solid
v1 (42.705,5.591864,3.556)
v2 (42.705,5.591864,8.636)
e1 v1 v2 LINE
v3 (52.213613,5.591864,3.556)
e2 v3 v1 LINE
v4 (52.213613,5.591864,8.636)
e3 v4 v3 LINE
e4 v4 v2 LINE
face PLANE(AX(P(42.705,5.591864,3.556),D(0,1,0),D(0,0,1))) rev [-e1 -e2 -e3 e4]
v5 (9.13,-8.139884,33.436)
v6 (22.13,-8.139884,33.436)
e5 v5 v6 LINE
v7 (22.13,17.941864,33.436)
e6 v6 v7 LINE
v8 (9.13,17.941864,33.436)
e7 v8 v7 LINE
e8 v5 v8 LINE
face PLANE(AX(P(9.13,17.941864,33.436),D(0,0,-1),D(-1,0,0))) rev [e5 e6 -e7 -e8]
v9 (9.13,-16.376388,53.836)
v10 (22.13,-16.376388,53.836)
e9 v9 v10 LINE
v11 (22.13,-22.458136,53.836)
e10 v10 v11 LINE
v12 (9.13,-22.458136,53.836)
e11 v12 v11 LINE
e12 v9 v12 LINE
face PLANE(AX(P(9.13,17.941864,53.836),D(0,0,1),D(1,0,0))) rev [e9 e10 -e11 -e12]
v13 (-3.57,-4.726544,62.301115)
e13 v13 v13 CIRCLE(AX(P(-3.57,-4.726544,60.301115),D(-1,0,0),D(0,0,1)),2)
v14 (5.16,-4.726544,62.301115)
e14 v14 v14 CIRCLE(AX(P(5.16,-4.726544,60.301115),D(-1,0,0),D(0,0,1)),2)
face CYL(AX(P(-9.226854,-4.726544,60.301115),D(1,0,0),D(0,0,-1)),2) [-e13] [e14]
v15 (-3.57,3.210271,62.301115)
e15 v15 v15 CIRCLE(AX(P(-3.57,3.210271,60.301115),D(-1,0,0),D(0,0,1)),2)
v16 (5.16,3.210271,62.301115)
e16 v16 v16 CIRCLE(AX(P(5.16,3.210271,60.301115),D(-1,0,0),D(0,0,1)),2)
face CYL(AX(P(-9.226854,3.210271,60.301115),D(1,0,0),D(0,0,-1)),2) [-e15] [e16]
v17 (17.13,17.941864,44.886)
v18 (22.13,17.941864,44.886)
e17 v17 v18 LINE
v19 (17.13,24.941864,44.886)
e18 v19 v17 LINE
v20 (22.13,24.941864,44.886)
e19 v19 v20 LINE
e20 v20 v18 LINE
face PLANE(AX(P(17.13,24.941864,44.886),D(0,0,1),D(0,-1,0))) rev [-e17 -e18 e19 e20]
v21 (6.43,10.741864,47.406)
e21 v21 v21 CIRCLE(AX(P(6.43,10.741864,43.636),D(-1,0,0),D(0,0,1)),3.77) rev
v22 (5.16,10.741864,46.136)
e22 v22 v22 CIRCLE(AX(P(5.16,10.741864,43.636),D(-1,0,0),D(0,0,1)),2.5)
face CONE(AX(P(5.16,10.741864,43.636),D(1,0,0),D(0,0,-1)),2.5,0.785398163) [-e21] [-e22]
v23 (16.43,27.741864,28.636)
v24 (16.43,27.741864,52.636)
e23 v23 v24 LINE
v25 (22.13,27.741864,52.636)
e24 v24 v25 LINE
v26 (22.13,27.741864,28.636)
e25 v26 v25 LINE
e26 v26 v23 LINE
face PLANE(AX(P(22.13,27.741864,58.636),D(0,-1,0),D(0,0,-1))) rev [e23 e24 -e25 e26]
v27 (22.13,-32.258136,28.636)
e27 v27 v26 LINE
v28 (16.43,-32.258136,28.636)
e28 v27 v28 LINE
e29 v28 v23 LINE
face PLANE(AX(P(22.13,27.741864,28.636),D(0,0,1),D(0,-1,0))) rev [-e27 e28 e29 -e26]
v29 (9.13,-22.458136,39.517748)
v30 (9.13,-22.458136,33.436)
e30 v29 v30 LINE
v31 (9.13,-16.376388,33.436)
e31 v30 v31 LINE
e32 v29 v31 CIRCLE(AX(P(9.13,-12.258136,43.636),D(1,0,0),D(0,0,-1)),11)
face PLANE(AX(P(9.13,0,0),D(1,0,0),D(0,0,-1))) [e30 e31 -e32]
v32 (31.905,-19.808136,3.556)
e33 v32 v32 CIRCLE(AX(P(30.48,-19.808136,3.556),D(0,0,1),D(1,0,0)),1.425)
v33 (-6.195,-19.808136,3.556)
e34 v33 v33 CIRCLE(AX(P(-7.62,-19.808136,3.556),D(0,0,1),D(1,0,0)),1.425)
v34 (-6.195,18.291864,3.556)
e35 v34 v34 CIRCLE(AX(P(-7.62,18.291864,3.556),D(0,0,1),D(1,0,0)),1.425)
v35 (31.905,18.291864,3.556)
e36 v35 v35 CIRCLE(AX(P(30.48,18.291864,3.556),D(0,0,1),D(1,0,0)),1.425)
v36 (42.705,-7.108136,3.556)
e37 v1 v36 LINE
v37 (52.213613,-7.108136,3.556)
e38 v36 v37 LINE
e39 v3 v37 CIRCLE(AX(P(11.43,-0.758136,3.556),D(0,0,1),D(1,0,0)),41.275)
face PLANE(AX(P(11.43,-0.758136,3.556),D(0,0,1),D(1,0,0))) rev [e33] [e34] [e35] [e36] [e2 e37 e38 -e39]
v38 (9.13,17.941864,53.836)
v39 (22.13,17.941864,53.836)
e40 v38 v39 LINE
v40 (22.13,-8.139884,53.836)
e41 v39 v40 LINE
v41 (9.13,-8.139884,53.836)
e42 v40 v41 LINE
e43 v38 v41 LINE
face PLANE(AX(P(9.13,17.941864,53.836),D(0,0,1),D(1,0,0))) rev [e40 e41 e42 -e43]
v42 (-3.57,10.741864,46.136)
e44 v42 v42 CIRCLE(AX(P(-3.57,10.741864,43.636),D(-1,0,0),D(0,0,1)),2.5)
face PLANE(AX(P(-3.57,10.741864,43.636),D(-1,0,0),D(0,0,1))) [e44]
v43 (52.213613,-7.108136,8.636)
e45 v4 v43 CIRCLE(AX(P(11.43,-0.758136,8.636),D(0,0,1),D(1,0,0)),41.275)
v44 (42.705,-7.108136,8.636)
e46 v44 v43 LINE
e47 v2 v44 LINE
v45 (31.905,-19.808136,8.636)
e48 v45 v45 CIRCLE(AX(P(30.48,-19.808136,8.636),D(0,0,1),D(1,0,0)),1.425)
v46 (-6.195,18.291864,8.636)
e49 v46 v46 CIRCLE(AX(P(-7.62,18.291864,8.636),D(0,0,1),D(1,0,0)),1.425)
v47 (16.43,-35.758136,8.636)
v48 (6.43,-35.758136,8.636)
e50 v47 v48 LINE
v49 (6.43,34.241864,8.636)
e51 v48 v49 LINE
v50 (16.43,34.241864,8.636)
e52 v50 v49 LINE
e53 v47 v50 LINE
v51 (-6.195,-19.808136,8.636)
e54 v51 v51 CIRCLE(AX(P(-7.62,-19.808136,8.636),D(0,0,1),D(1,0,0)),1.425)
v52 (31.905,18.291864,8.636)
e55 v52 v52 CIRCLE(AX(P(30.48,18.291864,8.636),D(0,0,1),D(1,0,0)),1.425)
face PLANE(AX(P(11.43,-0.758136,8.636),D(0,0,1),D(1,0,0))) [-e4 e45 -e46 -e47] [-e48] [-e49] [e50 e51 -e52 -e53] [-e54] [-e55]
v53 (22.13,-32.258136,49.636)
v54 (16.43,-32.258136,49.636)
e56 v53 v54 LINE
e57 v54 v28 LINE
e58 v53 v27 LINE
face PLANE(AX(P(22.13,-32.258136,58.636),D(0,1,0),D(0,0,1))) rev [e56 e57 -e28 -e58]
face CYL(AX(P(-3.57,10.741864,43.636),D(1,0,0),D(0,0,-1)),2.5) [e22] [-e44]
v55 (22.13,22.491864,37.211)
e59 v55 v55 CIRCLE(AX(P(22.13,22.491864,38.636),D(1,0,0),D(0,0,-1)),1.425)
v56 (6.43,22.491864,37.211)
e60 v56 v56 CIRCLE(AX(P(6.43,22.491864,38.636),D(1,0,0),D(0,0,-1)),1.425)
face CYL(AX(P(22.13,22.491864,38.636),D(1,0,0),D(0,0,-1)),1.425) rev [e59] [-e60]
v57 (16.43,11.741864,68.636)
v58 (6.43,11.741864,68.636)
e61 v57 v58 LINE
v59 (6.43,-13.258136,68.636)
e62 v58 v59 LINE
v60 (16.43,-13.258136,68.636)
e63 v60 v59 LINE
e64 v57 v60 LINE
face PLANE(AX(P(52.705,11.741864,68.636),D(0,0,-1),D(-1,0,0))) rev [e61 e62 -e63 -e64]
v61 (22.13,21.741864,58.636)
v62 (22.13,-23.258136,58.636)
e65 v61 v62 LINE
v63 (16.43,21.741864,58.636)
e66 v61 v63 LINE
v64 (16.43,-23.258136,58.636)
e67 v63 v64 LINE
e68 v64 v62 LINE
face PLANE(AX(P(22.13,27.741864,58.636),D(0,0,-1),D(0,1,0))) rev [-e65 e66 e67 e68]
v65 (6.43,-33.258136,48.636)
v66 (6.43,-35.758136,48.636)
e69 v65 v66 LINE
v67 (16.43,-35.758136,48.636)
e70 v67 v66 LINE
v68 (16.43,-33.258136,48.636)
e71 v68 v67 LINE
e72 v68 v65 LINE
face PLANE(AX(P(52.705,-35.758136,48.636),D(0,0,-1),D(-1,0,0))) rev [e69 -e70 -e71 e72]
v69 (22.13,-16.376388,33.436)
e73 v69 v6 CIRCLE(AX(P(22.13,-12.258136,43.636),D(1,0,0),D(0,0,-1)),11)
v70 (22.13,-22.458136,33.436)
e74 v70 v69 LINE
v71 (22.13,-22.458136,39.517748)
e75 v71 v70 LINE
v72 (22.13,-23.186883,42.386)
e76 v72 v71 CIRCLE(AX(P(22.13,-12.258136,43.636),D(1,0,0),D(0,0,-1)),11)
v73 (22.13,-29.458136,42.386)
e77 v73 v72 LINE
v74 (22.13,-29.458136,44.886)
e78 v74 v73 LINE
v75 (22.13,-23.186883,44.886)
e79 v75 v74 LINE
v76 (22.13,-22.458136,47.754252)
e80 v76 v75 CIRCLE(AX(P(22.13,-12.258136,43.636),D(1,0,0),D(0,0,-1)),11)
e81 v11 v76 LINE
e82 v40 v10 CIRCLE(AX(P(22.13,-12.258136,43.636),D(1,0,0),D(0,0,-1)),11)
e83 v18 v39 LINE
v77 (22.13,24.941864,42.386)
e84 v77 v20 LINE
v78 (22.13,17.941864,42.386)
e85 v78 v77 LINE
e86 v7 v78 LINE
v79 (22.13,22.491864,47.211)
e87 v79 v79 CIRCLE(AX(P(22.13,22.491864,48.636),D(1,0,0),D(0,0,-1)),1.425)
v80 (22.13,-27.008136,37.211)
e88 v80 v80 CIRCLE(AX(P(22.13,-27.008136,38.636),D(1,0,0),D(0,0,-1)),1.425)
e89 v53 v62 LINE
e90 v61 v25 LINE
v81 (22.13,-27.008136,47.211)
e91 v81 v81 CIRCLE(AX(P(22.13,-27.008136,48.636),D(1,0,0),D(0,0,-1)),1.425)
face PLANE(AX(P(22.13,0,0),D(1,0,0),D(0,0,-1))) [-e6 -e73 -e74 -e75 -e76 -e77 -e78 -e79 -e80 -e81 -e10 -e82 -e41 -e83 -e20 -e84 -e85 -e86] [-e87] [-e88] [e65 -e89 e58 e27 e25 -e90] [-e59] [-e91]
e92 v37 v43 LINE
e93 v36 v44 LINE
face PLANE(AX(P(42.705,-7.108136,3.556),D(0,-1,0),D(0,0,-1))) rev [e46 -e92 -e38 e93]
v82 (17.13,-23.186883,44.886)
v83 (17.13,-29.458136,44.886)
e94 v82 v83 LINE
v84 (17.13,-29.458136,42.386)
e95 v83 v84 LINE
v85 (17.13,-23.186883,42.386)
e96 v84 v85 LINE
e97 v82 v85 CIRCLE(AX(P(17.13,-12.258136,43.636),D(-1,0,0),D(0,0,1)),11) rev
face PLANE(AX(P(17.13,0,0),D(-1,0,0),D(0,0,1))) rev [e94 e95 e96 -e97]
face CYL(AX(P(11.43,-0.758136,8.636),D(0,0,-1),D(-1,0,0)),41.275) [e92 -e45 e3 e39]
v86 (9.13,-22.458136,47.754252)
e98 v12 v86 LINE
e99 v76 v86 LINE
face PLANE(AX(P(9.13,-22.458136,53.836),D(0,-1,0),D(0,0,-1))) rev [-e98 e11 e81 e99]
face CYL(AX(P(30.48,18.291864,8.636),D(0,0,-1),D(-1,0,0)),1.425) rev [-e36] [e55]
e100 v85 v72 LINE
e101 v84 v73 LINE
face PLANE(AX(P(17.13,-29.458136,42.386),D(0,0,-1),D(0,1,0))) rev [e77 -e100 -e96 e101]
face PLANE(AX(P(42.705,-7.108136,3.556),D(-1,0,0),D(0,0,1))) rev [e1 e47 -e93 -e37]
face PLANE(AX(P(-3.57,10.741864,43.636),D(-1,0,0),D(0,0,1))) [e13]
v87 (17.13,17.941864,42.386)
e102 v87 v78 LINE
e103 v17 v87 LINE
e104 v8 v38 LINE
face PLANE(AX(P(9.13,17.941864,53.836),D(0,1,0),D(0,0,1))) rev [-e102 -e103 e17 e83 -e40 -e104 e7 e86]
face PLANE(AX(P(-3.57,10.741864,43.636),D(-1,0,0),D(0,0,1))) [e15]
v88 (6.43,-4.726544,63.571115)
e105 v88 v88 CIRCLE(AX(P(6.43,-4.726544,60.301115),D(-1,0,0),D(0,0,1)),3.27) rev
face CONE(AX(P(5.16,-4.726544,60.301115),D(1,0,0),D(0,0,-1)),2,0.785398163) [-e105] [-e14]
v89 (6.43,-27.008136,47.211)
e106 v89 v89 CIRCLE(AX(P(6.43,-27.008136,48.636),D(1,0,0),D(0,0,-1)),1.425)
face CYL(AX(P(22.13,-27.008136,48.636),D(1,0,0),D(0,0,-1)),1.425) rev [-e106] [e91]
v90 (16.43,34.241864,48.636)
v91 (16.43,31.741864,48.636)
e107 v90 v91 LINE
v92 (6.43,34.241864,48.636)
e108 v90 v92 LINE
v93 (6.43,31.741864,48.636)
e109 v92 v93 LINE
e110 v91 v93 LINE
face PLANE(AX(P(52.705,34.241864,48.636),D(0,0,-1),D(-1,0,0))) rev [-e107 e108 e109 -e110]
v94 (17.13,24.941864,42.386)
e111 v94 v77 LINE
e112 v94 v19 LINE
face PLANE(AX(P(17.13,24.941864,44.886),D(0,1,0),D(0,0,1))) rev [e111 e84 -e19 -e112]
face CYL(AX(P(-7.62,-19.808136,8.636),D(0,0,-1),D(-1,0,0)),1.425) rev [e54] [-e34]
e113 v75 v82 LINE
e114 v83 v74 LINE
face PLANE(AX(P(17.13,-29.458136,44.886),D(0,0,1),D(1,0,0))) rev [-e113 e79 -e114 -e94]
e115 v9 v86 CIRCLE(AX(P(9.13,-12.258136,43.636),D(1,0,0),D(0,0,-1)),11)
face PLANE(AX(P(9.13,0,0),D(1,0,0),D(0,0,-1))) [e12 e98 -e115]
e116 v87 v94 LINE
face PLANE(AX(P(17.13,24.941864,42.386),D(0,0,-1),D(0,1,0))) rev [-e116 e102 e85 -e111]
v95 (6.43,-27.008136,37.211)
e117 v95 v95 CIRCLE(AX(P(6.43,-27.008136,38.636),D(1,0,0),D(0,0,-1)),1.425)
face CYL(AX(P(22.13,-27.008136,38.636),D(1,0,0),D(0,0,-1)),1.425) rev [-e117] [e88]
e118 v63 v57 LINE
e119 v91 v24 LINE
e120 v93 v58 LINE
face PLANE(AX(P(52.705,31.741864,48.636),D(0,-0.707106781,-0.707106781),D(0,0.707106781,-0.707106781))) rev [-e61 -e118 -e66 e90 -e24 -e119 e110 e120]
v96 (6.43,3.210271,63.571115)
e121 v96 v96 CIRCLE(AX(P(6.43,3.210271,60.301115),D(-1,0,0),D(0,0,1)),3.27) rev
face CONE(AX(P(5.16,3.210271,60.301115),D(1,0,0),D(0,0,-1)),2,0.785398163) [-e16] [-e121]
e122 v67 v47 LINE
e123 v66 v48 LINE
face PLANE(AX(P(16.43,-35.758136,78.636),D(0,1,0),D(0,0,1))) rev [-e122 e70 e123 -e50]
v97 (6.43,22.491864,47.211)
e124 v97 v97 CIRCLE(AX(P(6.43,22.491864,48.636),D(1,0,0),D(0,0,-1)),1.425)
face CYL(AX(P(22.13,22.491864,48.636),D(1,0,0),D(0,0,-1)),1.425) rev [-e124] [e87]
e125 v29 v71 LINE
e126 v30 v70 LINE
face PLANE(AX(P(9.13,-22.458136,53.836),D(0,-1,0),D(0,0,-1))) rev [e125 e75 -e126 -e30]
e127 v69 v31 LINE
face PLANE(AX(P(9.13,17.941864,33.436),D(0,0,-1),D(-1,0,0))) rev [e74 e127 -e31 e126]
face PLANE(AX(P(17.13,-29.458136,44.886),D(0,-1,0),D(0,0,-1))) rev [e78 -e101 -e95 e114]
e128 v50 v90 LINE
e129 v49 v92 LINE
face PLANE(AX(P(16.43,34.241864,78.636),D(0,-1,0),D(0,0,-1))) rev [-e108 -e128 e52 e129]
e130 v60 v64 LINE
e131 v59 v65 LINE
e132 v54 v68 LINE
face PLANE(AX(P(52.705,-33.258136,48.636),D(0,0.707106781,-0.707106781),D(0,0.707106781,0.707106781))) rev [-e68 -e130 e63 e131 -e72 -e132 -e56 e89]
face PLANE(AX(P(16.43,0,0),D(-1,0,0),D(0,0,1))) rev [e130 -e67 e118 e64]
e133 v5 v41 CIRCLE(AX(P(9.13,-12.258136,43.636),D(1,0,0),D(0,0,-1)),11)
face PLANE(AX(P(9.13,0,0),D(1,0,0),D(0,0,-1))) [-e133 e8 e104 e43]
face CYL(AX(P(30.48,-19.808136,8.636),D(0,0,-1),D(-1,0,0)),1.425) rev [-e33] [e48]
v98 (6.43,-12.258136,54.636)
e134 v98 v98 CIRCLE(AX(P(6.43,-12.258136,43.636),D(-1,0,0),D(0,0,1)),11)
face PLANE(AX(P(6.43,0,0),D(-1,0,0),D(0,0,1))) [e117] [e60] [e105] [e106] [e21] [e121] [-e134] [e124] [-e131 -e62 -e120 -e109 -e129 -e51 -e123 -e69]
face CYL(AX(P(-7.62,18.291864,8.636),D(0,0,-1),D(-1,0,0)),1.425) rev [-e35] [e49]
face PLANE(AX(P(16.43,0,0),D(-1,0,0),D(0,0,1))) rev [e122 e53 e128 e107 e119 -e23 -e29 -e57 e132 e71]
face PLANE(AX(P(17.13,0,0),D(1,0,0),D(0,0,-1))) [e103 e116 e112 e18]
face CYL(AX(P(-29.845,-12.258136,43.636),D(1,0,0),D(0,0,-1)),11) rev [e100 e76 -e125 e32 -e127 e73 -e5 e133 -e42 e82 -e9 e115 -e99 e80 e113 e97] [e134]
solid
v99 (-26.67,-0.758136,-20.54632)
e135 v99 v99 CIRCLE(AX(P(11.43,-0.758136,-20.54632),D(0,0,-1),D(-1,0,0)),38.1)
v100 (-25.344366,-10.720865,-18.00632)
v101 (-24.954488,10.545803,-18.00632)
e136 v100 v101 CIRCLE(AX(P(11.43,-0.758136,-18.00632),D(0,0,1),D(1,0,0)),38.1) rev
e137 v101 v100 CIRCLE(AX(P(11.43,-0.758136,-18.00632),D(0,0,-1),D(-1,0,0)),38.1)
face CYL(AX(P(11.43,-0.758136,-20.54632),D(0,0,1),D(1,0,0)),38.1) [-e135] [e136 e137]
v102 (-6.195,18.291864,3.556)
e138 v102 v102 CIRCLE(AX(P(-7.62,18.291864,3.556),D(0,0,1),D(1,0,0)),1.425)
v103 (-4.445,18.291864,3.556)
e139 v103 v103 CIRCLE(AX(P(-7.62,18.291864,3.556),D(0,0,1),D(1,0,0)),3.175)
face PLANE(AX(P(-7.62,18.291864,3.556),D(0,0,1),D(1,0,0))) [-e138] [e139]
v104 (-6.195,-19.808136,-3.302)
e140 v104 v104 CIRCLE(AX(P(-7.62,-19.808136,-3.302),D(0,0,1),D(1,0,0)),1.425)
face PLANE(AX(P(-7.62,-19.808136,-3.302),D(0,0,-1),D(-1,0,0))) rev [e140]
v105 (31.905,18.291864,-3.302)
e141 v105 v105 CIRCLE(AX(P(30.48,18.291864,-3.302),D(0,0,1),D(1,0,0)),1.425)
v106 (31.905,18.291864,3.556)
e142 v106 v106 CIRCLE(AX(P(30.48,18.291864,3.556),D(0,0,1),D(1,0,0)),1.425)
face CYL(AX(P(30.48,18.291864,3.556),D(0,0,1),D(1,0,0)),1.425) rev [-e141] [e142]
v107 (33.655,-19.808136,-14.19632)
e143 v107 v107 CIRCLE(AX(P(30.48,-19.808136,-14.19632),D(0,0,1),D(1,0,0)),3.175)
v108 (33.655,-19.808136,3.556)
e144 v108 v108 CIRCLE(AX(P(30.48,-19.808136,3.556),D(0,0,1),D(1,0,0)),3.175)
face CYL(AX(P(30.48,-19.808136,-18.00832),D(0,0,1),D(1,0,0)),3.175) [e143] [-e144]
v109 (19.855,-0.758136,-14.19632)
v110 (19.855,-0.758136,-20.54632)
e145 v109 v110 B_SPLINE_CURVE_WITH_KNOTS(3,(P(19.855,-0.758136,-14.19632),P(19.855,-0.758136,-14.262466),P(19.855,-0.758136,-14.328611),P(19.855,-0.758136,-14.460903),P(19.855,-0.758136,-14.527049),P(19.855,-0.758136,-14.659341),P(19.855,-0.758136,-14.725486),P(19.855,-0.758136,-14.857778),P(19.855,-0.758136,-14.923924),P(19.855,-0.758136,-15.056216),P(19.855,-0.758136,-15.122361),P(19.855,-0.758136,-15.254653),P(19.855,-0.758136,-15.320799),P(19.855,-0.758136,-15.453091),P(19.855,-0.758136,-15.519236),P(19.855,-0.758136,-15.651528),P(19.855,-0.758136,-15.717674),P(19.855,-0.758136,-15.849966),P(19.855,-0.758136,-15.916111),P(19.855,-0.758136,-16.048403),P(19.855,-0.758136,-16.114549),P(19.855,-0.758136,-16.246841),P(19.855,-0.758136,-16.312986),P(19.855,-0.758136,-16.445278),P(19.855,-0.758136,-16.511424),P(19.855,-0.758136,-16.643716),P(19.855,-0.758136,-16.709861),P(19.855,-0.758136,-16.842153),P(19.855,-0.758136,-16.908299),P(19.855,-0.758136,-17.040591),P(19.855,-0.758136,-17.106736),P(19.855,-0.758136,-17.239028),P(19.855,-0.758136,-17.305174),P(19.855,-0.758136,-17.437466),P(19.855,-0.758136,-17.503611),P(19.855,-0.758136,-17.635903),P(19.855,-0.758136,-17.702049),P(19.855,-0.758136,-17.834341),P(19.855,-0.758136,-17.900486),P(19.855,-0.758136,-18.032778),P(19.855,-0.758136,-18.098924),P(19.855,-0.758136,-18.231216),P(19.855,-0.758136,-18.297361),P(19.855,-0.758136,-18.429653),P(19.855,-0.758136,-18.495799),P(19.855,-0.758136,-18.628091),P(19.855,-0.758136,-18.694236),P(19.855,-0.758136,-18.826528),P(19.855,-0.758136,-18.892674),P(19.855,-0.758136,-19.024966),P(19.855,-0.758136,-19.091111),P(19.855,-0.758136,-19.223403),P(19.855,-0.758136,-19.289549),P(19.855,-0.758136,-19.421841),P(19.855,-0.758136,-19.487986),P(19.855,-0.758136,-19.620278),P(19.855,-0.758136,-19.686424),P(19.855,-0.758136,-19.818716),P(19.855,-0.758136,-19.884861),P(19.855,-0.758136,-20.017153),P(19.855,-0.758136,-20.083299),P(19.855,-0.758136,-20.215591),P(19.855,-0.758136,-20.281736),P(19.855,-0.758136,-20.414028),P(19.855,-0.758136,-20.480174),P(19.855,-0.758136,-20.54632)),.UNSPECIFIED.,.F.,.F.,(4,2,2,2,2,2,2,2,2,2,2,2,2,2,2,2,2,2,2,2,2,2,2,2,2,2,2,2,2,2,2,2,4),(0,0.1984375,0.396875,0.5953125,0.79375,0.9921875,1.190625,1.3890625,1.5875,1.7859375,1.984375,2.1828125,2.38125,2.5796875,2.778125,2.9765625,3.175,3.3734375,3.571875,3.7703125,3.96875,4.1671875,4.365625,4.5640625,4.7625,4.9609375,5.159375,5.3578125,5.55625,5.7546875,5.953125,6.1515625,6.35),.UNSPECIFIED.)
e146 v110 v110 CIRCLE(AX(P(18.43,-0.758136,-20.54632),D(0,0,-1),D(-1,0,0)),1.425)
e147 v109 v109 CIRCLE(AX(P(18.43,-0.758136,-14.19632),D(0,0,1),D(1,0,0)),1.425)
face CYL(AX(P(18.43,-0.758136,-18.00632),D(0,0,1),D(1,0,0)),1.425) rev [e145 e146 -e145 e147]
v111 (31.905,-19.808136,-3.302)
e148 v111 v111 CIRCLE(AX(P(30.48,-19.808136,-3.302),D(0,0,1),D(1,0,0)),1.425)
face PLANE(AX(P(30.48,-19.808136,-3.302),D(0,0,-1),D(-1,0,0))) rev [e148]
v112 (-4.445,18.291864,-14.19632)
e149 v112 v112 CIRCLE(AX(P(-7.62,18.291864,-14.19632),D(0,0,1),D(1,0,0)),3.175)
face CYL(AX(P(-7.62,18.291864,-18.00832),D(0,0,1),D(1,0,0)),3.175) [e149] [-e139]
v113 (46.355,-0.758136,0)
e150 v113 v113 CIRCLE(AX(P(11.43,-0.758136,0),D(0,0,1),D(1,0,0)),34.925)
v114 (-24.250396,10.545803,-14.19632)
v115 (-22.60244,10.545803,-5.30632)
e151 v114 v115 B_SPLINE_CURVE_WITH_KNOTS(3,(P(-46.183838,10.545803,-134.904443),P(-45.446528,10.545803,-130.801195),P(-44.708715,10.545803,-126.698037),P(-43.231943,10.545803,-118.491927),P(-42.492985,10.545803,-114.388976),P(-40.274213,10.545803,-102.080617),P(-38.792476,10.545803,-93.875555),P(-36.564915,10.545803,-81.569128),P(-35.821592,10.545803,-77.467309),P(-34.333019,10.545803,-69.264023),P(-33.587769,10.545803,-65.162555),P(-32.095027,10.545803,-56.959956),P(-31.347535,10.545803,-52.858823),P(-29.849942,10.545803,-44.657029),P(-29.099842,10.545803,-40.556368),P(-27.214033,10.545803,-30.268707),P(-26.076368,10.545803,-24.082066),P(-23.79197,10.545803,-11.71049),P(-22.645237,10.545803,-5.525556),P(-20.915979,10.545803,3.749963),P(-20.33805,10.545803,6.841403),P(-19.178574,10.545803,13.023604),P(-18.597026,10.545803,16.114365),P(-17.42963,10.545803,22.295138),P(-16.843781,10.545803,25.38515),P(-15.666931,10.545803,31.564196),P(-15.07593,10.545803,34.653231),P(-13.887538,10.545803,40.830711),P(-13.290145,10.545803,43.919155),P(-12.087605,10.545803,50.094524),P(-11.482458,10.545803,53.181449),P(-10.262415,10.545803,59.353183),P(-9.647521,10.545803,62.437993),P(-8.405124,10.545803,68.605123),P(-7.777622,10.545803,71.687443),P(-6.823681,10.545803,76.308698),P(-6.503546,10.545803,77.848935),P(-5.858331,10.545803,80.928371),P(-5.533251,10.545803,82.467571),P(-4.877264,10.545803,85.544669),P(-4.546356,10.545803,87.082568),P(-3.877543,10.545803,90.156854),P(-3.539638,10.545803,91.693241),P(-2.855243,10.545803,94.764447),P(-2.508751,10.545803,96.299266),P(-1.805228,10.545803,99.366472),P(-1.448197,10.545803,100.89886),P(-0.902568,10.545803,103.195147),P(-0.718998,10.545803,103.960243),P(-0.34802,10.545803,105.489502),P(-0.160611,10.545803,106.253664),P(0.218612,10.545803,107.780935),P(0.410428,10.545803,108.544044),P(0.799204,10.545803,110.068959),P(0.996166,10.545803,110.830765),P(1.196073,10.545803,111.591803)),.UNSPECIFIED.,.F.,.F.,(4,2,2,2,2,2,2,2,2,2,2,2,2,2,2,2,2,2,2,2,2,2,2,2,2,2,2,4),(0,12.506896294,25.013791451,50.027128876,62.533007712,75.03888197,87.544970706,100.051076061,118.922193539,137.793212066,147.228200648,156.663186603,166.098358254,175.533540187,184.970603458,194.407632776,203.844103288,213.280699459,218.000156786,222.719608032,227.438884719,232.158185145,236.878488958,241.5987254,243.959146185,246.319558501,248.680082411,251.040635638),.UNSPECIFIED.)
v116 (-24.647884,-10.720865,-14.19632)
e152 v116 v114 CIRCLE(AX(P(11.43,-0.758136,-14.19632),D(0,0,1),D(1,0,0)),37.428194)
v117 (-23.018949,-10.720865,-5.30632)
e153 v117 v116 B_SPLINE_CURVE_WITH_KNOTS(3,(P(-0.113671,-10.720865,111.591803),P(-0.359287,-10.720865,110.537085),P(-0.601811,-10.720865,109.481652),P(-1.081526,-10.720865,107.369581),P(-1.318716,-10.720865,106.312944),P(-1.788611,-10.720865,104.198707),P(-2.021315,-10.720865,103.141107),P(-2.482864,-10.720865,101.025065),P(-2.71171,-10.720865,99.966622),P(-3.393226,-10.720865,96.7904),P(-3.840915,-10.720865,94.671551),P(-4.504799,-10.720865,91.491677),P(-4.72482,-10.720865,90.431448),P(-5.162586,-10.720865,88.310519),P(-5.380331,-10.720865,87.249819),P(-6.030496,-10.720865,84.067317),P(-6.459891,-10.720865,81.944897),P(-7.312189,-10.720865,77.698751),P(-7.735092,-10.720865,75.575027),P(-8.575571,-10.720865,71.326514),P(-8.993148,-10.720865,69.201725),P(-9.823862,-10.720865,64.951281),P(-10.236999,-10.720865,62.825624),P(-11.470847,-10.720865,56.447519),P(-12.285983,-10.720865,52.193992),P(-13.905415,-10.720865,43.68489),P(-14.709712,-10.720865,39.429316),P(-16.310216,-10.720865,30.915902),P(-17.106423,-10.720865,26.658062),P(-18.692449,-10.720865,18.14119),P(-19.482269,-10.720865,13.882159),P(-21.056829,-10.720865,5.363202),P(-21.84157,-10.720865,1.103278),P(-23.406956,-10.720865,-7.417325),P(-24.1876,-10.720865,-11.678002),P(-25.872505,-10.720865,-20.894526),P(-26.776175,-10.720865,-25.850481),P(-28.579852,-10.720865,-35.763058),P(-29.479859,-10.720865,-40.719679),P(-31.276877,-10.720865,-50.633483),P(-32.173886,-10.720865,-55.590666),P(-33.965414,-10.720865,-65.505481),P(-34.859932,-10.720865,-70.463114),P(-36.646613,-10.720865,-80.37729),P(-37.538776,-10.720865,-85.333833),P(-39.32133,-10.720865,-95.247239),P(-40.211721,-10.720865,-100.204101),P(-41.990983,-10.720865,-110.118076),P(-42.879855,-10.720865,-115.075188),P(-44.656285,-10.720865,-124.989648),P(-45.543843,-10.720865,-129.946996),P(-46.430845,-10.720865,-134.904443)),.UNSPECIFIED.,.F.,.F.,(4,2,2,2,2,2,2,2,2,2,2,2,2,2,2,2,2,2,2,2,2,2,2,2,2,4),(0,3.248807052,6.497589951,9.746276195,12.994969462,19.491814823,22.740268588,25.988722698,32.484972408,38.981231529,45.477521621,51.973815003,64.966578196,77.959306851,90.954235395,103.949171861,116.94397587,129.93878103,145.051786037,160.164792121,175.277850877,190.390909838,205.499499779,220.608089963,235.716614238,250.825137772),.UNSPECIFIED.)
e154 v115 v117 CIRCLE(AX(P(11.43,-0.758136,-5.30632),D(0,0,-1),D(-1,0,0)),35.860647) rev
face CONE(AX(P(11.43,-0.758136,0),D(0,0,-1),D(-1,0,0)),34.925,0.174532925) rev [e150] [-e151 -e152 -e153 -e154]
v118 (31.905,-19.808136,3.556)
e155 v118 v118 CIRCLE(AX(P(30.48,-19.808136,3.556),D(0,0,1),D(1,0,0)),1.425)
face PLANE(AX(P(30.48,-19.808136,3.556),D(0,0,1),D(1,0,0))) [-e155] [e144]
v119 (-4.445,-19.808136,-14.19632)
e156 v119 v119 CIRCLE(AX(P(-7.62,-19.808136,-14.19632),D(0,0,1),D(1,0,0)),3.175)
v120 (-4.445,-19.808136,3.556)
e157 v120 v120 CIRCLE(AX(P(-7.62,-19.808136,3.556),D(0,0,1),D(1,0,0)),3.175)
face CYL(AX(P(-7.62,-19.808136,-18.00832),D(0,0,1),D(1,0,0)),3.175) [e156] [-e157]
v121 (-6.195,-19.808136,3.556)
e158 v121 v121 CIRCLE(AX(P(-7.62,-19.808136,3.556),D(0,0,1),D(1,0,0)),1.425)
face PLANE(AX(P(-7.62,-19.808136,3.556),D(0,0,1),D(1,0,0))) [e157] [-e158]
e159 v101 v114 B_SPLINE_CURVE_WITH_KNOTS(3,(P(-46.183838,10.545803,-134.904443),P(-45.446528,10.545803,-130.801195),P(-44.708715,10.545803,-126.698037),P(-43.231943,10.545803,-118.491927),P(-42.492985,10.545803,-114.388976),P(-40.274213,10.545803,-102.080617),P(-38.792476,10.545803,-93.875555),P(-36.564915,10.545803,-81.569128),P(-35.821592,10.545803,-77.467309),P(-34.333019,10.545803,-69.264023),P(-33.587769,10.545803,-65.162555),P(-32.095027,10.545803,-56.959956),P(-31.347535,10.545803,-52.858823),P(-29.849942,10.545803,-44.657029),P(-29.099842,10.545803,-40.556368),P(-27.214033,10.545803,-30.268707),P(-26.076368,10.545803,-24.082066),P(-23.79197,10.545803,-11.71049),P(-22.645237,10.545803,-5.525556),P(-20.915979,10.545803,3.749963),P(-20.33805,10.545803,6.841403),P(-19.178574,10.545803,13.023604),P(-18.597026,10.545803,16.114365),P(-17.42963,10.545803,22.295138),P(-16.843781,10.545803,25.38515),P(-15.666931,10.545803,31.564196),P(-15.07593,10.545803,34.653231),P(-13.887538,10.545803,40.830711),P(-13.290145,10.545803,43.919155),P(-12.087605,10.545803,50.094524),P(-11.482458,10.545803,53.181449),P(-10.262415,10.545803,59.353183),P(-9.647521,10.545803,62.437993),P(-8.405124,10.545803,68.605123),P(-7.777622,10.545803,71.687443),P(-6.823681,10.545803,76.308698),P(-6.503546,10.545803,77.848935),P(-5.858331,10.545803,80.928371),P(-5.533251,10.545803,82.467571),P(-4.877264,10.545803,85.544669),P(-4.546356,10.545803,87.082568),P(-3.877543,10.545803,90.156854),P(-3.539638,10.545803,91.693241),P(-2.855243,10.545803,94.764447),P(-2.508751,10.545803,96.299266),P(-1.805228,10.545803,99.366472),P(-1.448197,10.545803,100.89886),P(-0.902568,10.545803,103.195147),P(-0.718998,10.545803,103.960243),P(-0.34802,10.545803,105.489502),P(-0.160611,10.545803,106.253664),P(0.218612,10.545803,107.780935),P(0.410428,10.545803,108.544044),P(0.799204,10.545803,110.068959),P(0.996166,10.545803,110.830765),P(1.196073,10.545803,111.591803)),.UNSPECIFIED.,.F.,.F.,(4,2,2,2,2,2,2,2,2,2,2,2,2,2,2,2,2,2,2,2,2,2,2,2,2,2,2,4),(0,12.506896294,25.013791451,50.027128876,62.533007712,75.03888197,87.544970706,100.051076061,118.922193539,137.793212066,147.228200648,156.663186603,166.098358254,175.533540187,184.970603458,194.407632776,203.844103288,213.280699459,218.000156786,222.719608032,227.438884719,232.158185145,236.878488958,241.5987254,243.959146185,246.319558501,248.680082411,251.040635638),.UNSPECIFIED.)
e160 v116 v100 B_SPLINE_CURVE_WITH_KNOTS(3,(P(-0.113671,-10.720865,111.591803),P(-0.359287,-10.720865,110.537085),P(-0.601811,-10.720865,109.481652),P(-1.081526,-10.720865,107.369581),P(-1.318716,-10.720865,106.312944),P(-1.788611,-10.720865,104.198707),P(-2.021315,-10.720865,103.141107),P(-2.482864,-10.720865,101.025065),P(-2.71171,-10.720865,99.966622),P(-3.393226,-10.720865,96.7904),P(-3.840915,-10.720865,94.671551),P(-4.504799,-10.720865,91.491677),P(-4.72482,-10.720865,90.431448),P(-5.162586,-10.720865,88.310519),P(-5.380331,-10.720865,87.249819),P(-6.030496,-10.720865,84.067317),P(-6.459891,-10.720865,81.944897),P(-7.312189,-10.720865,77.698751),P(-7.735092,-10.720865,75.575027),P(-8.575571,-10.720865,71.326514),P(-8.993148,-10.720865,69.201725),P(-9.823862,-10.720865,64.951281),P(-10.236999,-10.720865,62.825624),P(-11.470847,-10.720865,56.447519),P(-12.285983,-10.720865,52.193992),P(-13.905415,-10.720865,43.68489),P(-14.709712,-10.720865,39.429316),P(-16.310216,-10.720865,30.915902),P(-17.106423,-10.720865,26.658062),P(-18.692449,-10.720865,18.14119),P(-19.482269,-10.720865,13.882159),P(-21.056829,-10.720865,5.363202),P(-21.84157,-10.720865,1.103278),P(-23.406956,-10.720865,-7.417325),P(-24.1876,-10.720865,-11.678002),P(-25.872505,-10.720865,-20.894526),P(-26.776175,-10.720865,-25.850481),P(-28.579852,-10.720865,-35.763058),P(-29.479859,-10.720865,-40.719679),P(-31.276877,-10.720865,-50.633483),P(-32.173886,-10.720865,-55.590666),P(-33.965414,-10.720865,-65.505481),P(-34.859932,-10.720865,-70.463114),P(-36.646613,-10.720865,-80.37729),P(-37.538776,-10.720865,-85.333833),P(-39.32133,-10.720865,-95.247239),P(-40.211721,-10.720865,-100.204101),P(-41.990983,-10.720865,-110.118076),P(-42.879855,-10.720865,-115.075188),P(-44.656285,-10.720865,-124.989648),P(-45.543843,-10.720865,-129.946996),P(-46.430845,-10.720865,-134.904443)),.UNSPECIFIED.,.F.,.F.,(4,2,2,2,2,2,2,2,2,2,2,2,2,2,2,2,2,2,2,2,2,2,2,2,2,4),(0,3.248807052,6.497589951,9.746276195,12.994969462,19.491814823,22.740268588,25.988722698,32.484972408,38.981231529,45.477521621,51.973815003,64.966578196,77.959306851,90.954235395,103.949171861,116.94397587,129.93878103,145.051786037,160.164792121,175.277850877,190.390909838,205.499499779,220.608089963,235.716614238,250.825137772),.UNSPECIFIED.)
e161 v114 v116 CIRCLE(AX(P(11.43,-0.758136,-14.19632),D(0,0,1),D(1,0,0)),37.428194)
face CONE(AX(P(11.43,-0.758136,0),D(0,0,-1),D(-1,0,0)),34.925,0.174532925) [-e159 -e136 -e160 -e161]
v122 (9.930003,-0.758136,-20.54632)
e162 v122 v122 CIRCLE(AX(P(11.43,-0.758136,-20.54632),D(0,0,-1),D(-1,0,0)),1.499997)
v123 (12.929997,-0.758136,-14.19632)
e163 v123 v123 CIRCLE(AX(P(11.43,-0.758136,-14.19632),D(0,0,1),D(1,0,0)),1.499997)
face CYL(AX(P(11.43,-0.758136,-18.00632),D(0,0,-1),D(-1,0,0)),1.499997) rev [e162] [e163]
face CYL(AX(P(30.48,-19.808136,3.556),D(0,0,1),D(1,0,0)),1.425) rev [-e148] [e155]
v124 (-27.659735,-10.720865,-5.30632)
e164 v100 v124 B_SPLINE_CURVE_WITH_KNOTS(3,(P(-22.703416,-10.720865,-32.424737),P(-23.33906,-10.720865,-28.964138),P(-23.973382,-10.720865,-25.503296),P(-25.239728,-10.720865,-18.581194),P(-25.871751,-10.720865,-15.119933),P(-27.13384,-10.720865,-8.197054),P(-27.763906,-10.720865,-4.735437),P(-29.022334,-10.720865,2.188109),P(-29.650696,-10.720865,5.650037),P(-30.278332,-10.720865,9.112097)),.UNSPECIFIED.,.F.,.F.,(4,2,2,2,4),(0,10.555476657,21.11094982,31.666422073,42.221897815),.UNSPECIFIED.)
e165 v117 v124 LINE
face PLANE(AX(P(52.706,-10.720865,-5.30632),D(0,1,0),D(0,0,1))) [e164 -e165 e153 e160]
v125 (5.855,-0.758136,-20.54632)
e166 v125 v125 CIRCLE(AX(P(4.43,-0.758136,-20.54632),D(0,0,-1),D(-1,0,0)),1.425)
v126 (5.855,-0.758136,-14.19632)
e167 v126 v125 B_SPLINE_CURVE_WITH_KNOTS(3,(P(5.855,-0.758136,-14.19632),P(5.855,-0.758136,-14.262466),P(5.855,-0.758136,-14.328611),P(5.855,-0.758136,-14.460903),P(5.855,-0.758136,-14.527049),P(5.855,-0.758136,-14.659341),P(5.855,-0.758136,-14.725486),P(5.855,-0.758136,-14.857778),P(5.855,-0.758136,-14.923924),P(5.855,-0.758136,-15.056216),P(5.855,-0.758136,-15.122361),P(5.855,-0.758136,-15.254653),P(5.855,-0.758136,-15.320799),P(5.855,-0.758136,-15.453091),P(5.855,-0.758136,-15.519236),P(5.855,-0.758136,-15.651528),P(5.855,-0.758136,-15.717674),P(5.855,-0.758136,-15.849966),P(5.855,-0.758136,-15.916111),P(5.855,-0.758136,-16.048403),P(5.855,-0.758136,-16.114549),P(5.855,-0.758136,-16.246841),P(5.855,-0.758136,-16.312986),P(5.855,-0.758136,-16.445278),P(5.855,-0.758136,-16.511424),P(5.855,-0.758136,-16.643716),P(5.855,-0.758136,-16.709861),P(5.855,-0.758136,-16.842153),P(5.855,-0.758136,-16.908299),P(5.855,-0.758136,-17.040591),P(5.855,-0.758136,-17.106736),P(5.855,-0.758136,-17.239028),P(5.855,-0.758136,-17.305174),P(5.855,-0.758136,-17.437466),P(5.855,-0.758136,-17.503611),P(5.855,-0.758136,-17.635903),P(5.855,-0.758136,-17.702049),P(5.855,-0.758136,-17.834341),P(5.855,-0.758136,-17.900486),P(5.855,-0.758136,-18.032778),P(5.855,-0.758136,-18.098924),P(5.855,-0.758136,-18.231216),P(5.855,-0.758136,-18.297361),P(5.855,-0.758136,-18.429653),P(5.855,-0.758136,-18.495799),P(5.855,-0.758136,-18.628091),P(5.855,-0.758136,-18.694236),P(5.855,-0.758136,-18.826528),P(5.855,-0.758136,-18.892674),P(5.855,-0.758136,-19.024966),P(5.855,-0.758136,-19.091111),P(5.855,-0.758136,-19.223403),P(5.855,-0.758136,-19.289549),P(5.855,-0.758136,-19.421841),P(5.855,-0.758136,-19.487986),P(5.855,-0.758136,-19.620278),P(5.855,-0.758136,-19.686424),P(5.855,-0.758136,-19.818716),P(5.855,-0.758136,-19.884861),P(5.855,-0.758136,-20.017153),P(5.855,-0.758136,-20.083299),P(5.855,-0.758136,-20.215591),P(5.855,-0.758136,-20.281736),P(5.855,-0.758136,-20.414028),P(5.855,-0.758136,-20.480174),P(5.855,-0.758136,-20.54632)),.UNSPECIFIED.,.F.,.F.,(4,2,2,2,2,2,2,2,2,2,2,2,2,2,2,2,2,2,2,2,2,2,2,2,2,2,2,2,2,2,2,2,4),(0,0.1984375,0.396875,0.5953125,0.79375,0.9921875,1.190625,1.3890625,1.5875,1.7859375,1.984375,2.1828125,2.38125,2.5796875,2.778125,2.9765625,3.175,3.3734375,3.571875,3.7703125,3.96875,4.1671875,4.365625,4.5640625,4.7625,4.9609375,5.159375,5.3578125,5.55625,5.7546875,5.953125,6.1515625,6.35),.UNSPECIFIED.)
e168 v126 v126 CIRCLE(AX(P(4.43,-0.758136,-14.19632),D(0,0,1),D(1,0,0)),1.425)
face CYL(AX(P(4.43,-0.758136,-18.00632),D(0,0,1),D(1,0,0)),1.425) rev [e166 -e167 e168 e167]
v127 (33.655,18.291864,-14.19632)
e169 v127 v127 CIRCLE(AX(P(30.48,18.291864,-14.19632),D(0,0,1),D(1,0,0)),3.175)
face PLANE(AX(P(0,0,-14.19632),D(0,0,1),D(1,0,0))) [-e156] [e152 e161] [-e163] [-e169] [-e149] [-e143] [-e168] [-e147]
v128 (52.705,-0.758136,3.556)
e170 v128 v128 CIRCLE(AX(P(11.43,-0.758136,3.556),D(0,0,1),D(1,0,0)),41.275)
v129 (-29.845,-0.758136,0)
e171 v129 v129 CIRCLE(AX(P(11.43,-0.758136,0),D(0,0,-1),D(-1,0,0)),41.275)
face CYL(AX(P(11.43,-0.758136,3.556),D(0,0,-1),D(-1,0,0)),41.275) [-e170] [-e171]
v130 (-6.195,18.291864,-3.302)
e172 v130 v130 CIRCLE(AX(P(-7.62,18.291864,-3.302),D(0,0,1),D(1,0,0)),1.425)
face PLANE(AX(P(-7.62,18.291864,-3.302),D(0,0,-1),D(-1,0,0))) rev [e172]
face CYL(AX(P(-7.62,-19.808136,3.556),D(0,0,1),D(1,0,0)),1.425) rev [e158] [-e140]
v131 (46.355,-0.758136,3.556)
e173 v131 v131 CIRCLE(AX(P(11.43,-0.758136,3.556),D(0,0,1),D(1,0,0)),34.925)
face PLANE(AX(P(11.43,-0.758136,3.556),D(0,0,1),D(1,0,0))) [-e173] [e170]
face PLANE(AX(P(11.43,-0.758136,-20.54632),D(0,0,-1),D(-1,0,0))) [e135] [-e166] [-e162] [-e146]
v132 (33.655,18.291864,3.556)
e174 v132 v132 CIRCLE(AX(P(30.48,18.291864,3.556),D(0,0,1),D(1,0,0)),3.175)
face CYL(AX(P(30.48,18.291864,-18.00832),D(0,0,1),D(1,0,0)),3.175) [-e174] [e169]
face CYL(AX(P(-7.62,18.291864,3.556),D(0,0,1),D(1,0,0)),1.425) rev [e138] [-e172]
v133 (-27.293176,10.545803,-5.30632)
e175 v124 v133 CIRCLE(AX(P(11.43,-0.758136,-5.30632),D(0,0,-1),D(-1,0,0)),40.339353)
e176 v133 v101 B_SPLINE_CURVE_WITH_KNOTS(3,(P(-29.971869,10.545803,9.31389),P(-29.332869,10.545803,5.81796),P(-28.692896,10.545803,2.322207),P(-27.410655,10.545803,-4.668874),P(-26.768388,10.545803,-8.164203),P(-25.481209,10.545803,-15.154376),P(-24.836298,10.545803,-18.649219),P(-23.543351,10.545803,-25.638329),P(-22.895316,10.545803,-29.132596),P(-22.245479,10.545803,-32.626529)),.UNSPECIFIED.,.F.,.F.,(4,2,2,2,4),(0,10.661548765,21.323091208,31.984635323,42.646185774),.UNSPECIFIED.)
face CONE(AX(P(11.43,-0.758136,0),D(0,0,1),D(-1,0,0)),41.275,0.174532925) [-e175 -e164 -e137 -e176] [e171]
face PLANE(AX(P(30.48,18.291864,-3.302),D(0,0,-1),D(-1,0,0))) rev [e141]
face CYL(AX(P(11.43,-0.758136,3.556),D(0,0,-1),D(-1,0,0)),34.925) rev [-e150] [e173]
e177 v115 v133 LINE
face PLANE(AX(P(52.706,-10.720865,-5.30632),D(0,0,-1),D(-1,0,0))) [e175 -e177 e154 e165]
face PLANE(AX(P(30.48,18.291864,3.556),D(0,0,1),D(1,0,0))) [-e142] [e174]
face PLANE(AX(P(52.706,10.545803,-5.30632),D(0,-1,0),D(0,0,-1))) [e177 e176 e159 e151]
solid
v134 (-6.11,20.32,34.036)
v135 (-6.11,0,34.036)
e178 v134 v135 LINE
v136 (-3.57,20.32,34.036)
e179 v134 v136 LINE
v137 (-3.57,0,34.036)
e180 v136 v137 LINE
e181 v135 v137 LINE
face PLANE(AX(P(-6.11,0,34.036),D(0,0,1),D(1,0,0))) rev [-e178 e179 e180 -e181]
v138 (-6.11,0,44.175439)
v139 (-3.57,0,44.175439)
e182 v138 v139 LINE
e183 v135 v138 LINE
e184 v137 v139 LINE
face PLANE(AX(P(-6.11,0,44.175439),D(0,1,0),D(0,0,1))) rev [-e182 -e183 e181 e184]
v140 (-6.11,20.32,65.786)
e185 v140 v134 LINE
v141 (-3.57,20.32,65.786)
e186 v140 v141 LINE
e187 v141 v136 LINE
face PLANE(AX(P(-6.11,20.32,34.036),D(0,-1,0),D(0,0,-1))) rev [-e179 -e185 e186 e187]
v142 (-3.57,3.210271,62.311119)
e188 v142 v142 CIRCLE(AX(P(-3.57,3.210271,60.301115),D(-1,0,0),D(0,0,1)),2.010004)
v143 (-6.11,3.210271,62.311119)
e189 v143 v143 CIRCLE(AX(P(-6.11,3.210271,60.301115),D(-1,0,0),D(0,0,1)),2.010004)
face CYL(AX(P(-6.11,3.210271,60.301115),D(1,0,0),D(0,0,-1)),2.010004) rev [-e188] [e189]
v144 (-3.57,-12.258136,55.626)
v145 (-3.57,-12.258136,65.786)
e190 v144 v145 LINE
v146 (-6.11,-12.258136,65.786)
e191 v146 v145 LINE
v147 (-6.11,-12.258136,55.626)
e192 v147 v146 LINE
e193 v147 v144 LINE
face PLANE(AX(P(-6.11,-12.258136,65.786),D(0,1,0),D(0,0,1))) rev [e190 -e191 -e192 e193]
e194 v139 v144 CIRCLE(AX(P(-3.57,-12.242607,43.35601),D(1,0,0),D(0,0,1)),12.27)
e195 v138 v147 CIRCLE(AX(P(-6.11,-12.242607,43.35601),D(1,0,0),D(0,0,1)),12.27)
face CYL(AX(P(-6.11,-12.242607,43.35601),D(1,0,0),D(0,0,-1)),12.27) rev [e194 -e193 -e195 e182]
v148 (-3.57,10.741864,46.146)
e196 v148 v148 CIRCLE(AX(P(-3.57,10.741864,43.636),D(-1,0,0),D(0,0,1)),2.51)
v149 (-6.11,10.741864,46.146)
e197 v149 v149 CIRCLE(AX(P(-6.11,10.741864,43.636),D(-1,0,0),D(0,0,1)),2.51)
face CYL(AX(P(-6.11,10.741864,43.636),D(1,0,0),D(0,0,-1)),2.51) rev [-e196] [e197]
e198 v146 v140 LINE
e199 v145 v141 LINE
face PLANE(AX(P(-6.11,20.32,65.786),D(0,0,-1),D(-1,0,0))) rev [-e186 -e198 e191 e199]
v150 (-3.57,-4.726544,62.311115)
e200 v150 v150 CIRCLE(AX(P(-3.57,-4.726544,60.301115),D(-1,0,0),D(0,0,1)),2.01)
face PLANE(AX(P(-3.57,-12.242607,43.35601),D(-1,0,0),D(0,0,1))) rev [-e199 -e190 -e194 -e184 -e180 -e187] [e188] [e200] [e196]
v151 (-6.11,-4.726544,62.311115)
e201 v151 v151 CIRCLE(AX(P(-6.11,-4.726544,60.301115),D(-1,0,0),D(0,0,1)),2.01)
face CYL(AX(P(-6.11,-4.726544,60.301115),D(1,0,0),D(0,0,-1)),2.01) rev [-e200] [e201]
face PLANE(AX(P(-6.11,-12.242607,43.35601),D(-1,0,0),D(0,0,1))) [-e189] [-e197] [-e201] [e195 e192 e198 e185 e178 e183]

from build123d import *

# Parameters (mm, degrees)
SKETCH2_R                      = 41.27500000000001
SKETCH2_R_2                    = 34.925000000000004
BOSS_EXTRUDE1_DEPTH            = 3.555999999999654
SKETCH54_R                     = 41.27500000000001
SKETCH54_R_2                   = 34.92500000000001
BOSS_EXTRUDE2_DEPTH            = 25.4
BOSS_EXTRUDE2_TAPER            = 10.000000000000021
BOSS_EXTRUDE3_START            = -18.006319777
BOSS_EXTRUDE3_OUTLINE_R        = 38.1
BOSS_EXTRUDE3_DEPTH            = 3.81
BOSS_EXTRUDE5_REACH            = 72.778
SKETCH63_R                     = 3.175000000000002
SKETCH63_R_2                   = 3.175000000000009
SKETCH63_R_3                   = 3.1750000000000056
F_3_0MM_DOWEL_HOLE4_D          = 2.85
F_3_0MM_DOWEL_HOLE4_DEPTH      = 6.858
F_3_0MM_DOWEL_HOLE3_D          = 2.999994
CUT_EXTRUDE2_REACH             = 126.878
SKETCH58_W                     = 12.700000000000001
SKETCH58_H                     = 21.266668123278706
SKETCH60_R                     = 1.4249999999999978
SKETCH60_R_2                   = 1.4250000000000005
CUT_EXTRUDE4_DEPTH             = 70.71188168256496
SKETCH64_R                     = 1.425000000000001
SKETCH64_R_2                   = 1.4249999999999978
SKETCH64_R_3                   = 1.499996999999999
BOSS_EXTRUDE6_DEPTH            = 2.54
SKETCH67_R                     = 41.27500000000003
SKETCH67_R_2                   = 1.4249999999999985
SKETCH67_R_3                   = 1.4249999999999976
BOSS_EXTRUDE7_DEPTH            = 5.08
SKETCH68_W                     = 20
SKETCH68_H                     = 12.7
CUT_EXTRUDE5_DEPTH             = 5.08
BOSS_EXTRUDE8_START            = 11.43
SKETCH70_W                     = 70.00000000000001
SKETCH70_H                     = 70
BOSS_EXTRUDE8_DEPTH            = 5
BOSS_EXTRUDE9_DEPTH            = 5.699999999999999
CUT_EXTRUDE6_DEPTH             = 13
F_3_0MM_DOWEL_HOLE5_AT_2_COUNT = 2
F_3_0MM_DOWEL_HOLE5_AT_2_PITCH = 10
F_3_0MM_DOWEL_HOLE5_AT_3_COUNT = 2
F_3_0MM_DOWEL_HOLE5_AT_3_PITCH = 49.5
F_3_0MM_DOWEL_HOLE5_AT_4_COUNT = 2
F_3_0MM_DOWEL_HOLE5_AT_4_PITCH = 50.5
CUT_EXTRUDE7_DEPTH             = 100.24306365899265
CUT_EXTRUDE7_DEPTH_BACK        = 100.24306365899265
SKETCH76_R                     = 11
CUT_EXTRUDE9_DEPTH             = 5
SKETCH78_R                     = 2.5000000000000018
BOSS_EXTRUDE10_DEPTH           = 10
SKETCH79_R                     = 2.000000000000003
BOSS_EXTRUDE11_DEPTH           = 10
CUT_EXTRUDE10_DEPTH            = 101.45785526758407
CHAMFER1_SIZE                  = 1.27
SKETCH81_R                     = 2.510000000000005
SKETCH81_R_2                   = 2.0100035999999983
SKETCH81_R_3                   = 2.0100000000000047
BOSS_EXTRUDE12_DEPTH           = 2.54


with BuildPart() as part:
    # Sketch2 → Boss-Extrude1 (new body)
    with BuildSketch(Plane(origin=(0, 0.7215916123591171, 0), x_dir=(1, 0, 0), z_dir=(0, 0, 1))):
        with Locations((11.43, -1.4797279014976155)):
            Circle(SKETCH2_R)
        with Locations((11.43, -1.4797279014976155)):
            Circle(SKETCH2_R_2, mode=Mode.SUBTRACT)
    extrude(amount=BOSS_EXTRUDE1_DEPTH)

    # Sketch54 → Boss-Extrude2 (add)
    with BuildSketch(Plane(origin=(0, 0, 0), x_dir=(-1, 0, 0), z_dir=(0, 0, -1))):
        with Locations((-11.43, -0.7581362891384984)):
            Circle(SKETCH54_R)
        with Locations(Location((-11.43, -0.7581362891384984, 0), (0, 0, 180))):
            Circle(SKETCH54_R_2, mode=Mode.SUBTRACT)
    extrude(amount=BOSS_EXTRUDE2_DEPTH, taper=BOSS_EXTRUDE2_TAPER)

    # Boss-Extrude3: read off the stored shape, not the designer's step
    # Boss-Extrude3 outline → Boss-Extrude3 (add)
    with BuildSketch(Plane.XY.offset(BOSS_EXTRUDE3_START)):
        with Locations((11.43, -0.758136289)):
            Circle(BOSS_EXTRUDE3_OUTLINE_R)
    extrude(amount=BOSS_EXTRUDE3_DEPTH)

    # Sketch63 → Boss-Extrude5 (add, up to next)
    with BuildSketch(Plane.XY.offset(3.555999999999654), mode=Mode.PRIVATE) as boss_extrude5_sk1:
        with Locations((-7.620000000000005, 18.291863710861502)):
            Circle(SKETCH63_R)
    boss_extrude5_tool1 = extrude(boss_extrude5_sk1.sketch, amount=-BOSS_EXTRUDE5_REACH, mode=Mode.PRIVATE) - part.part
    # Sketch63 → Boss-Extrude5 (add, up to next)
    with BuildSketch(Plane.XY.offset(3.555999999999654), mode=Mode.PRIVATE) as boss_extrude5_sk2:
        with Locations((30.479999999999997, 18.29186371086151)):
            Circle(SKETCH63_R_2)
    boss_extrude5_tool2 = extrude(boss_extrude5_sk2.sketch, amount=-BOSS_EXTRUDE5_REACH, mode=Mode.PRIVATE) - part.part
    # Sketch63 → Boss-Extrude5 (add, up to next)
    with BuildSketch(Plane.XY.offset(3.555999999999654), mode=Mode.PRIVATE) as boss_extrude5_sk3:
        with Locations((30.480000000000004, -19.8081362891385)):
            Circle(SKETCH63_R_2)
    boss_extrude5_tool3 = extrude(boss_extrude5_sk3.sketch, amount=-BOSS_EXTRUDE5_REACH, mode=Mode.PRIVATE) - part.part
    # Sketch63 → Boss-Extrude5 (add, up to next)
    with BuildSketch(Plane.XY.offset(3.555999999999654), mode=Mode.PRIVATE) as boss_extrude5_sk4:
        with Locations((-7.620000000000005, -19.8081362891385)):
            Circle(SKETCH63_R_3)
    boss_extrude5_tool4 = extrude(boss_extrude5_sk4.sketch, amount=-BOSS_EXTRUDE5_REACH, mode=Mode.PRIVATE) - part.part
    add(boss_extrude5_tool1.solids().sort_by_distance((-7.62, 18.291864, 3.556))[0])
    add(boss_extrude5_tool2.solids().sort_by_distance((30.48, 18.291864, 3.556))[0])
    add(boss_extrude5_tool3.solids().sort_by_distance((30.48, -19.808136, 3.556))[0])
    add(boss_extrude5_tool4.solids().sort_by_distance((-7.62, -19.808136, 3.556))[0])

    # Ø3.0mm Dowel Hole4
    with Locations(Plane.XY.offset(3.555999999999654)):
        with Locations((-7.62, 18.291863711), (30.48, 18.291863711), (30.48, -19.808136289), (-7.62, -19.808136289)):
            Hole(F_3_0MM_DOWEL_HOLE4_D / 2, depth=F_3_0MM_DOWEL_HOLE4_DEPTH)

    # Ø3.0mm Dowel Hole3 (through all)
    with Locations(Plane(origin=(0, 0, -18.006319777286222), x_dir=(-1, 0, 0), z_dir=(0, 0, -1))):
        with Locations((-11.43, -0.758136289)):
            Hole(F_3_0MM_DOWEL_HOLE3_D / 2)

    # Cut-Extrude2: up to this cone (the profile starts outside it)
    cut_extrude2_end = Plane(origin=(11.43, -0.7581362891384984, -11.65632), z_dir=(0, 0, -1)) * Cone(7.999516737370435, 65.961130686173, 328.7166474235434, mode=Mode.PRIVATE)
    # Sketch58 → Cut-Extrude2 (cut, up to the surface)
    with BuildSketch(Plane(origin=(-63.5, 0, 0), x_dir=(0, 0, -1), z_dir=(1, 0, 0)), mode=Mode.PRIVATE) as cut_extrude2_sk1:
        with Locations((11.656319777286228, -0.08753137128510957)):
            Rectangle(SKETCH58_W, SKETCH58_H)
    cut_extrude2_tool1 = extrude(cut_extrude2_sk1.sketch, amount=CUT_EXTRUDE2_REACH, mode=Mode.PRIVATE) - cut_extrude2_end
    add(cut_extrude2_tool1.solids().sort_by_distance((-63.5, -0.087531, -11.65632))[0], mode=Mode.SUBTRACT)

    # Sketch60 → Cut-Extrude4 (cut, through all)
    with BuildSketch(Plane.XY.offset(-14.196319777286222)):
        with Locations((18.43, -0.7581362891384957)):
            Circle(SKETCH60_R)
        with Locations((4.429999999999999, -0.7581362891384984)):
            Circle(SKETCH60_R_2)
    extrude(amount=-CUT_EXTRUDE4_DEPTH, mode=Mode.SUBTRACT)

    # Sketch64 → Boss-Extrude6 (add)
    with BuildSketch(Plane(origin=(0, 0, -18.006319777286222), x_dir=(-1, 0, 0), z_dir=(0, 0, -1))):
        with BuildLine():
            ThreePointArc((25.344366452837203, -10.720865432924475), (26.663599038852283, -0.05977229582778121), (24.954487952256596, 10.545802690354252))
            ThreePointArc((24.954487952256596, 10.545802690354252), (-49.52359903885228, -1.4565002824492193), (25.344366452837203, -10.720865432924475))
        make_face()
        with Locations(Location((-4.429999999999999, -0.7581362891384984, 0), (0, 0, 180))):
            Circle(SKETCH64_R, mode=Mode.SUBTRACT)
        with Locations(Location((-18.43, -0.7581362891384957, 0), (0, 0, 180))):
            Circle(SKETCH64_R_2, mode=Mode.SUBTRACT)
        with Locations((-11.43, -0.7581362891384984)):
            Circle(SKETCH64_R_3, mode=Mode.SUBTRACT)
    extrude(amount=BOSS_EXTRUDE6_DEPTH)


with BuildPart() as body_2:
    # Sketch67 → Boss-Extrude7 (new body)
    with BuildSketch(Plane.XY.offset(3.555999999999654)):
        with Locations((11.43, -0.7581362891384984)):
            Circle(SKETCH67_R)
        with Locations((-7.620000000000005, -19.8081362891385)):
            Circle(SKETCH67_R_2, mode=Mode.SUBTRACT)
        with Locations((30.480000000000004, -19.8081362891385)):
            Circle(SKETCH67_R_3, mode=Mode.SUBTRACT)
        with Locations((30.479999999999997, 18.29186371086151)):
            Circle(SKETCH67_R_3, mode=Mode.SUBTRACT)
        with Locations((-7.620000000000005, 18.291863710861502)):
            Circle(SKETCH67_R_2, mode=Mode.SUBTRACT)
    extrude(amount=BOSS_EXTRUDE7_DEPTH)

    # Sketch68 → Cut-Extrude5 (cut)
    with BuildSketch(Plane.XY.offset(8.635999999999655)):
        with Locations((52.70500000000003, -0.7581362891385006)):
            Rectangle(SKETCH68_W, SKETCH68_H)
    extrude(amount=-CUT_EXTRUDE5_DEPTH, mode=Mode.SUBTRACT)

    # Sketch70 → Boss-Extrude8 (add, symmetric)
    with BuildSketch(Plane(origin=(0, 0, 0), x_dir=(0, 0, -1), z_dir=(1, 0, 0)).offset(BOSS_EXTRUDE8_START)):
        with Locations((-43.63599999999966, -0.7581362891384948)):
            Rectangle(SKETCH70_W, SKETCH70_H)
    extrude(amount=BOSS_EXTRUDE8_DEPTH, both=True)

    # Sketch71 → Boss-Extrude9 (add)
    with BuildSketch(Plane(origin=(16.43, 0, 0), x_dir=(0, 0, -1), z_dir=(1, 0, 0))):
        Polygon((-58.635999999999655, 27.741863710861526), (-28.635999999999655, 27.741863710861526), (-28.635999999999648, -32.25813628913847), (-58.63599999999963, -32.25813628913847), align=None)
    extrude(amount=BOSS_EXTRUDE9_DEPTH)

    # Sketch72 → Cut-Extrude6 (cut)
    with BuildSketch(Plane(origin=(22.13, 0, 0), x_dir=(0, 0, -1), z_dir=(1, 0, 0))):
        Polygon((-53.83599999999965, 17.94186371086152), (-33.435999999999645, 17.941863710861533), (-33.435999999999645, -22.458136289138466), (-53.83599999999965, -22.45813628913848), align=None)
    extrude(amount=-CUT_EXTRUDE6_DEPTH, mode=Mode.SUBTRACT)

    # Sketch75 → Ø3.0mm Dowel Hole5 (revolve, cut)
    with BuildSketch(Plane(origin=(22.13, -27.00813628913847, 38.63599999999965), x_dir=(0, 0, -1), z_dir=(0, 1, 0))):
        Polygon((0, 0), (-3.85e-15, 15.700000000000003), (1.4249999999999974, 15.700000000000003), (1.4249999999999994, -1e-17), align=None)
    f_3_0mm_dowel_hole5 = revolve(axis=Axis((28.47999999999999, -27.00813628913847, 38.63599999999965), (-1, 0, 0)), mode=Mode.SUBTRACT)

    # Ø3.0mm Dowel Hole5 at 2: Ø3.0mm Dowel Hole5 ×2
    with Locations(*[(0, 0, i * F_3_0MM_DOWEL_HOLE5_AT_2_PITCH) for i in range(1, F_3_0MM_DOWEL_HOLE5_AT_2_COUNT)]):
        add(f_3_0mm_dowel_hole5, mode=Mode.SUBTRACT)

    # Ø3.0mm Dowel Hole5 at 3: Ø3.0mm Dowel Hole5 ×2
    with Locations(*[(0, i * F_3_0MM_DOWEL_HOLE5_AT_3_PITCH, 0) for i in range(1, F_3_0MM_DOWEL_HOLE5_AT_3_COUNT)]):
        add(f_3_0mm_dowel_hole5, mode=Mode.SUBTRACT)

    # Ø3.0mm Dowel Hole5 at 4: Ø3.0mm Dowel Hole5 ×2
    with Locations(*[Vector(0, 0.9801980198019803, 0.19801980198019806) * (i * F_3_0MM_DOWEL_HOLE5_AT_4_PITCH) for i in range(1, F_3_0MM_DOWEL_HOLE5_AT_4_COUNT)]):
        add(f_3_0mm_dowel_hole5, mode=Mode.SUBTRACT)

    # Sketch76 → Cut-Extrude7 (cut, two sides: drawn at the far end of the back side and taken through both)
    with BuildSketch(Plane(origin=(9.13, 0, 0), x_dir=(0, 0, -1), z_dir=(1, 0, 0)).offset(-CUT_EXTRUDE7_DEPTH_BACK)):
        with Locations(Location((-43.63599999999964, -12.258136289138482, 0), (0, 0, 338.013597003))):
            Circle(SKETCH76_R)
    extrude(amount=CUT_EXTRUDE7_DEPTH + CUT_EXTRUDE7_DEPTH_BACK, mode=Mode.SUBTRACT)

    # Sketch77 → Cut-Extrude9 (cut)
    with BuildSketch(Plane(origin=(22.13, 0, 0), x_dir=(0, 0, -1), z_dir=(1, 0, 0))):
        Polygon((-44.88599999999964, 24.941863710861522), (-42.38599999999964, 24.94186371086152), (-42.38599999999965, 17.941863710861515), (-44.88599999999963, 17.941863710861515), align=None)
        Polygon((-44.88599999999964, -29.458136289138476), (-42.38599999999965, -29.458136289138476), (-42.38599999999964, -22.45813628913848), (-44.88599999999964, -22.45813628913848), align=None)
    extrude(amount=-CUT_EXTRUDE9_DEPTH, mode=Mode.SUBTRACT)

    # Sketch78 → Boss-Extrude10 (add)
    with BuildSketch(Plane.ZY.offset(-6.429999999999999)):
        with Locations((43.63599999999964, 10.741863710861484)):
            Circle(SKETCH78_R)
    extrude(amount=BOSS_EXTRUDE10_DEPTH)

    # Sketch79 → Boss-Extrude11 (add)
    with BuildSketch(Plane.ZY.offset(-6.429999999999999)):
        with Locations((60.30111511679786, 3.2102714393784137)):
            Circle(SKETCH79_R)
        with Locations(Location((60.30111511679786, -4.726544017655412, 0), (0, 0, 180))):
            Circle(SKETCH79_R)
    extrude(amount=BOSS_EXTRUDE11_DEPTH)

    # Sketch80 → Cut-Extrude10 (cut, through all)
    with BuildSketch(Plane.ZY.offset(-6.429999999999999)):
        Polygon((78.63599999999967, 34.24186371086151), (48.63599999999967, 34.24186371086151), (48.63599999999967, 31.741863710861587), (68.63599999999967, 11.741863710861503), (68.63599999999967, -13.258136289138498), (48.63599999999967, -33.258136289138584), (48.63599999999967, -35.7581362891385), (78.63599999999967, -35.7581362891385), align=None)
    extrude(amount=-CUT_EXTRUDE10_DEPTH, mode=Mode.SUBTRACT)

    # Chamfer1
    chamfer1_edges = [body_2.edges().sort_by_distance(p)[0] for p in [
        (6.429999999999999, 10.741863710861484, 41.13599999999964),
        (6.429999999999999, 3.210271439378414, 58.30111511679786),
        (6.429999999999999, -4.726544017655413, 62.30111511679786),
    ]]
    chamfer(chamfer1_edges, length=CHAMFER1_SIZE)


with BuildPart() as body_3:
    # Sketch81 → Boss-Extrude12 (new body)
    with BuildSketch(Plane.ZY.offset(3.570000000000001)):
        with BuildLine():
            Line((34.03599999999965, 20.32), (65.78599999999965, 20.32))
            Line((65.78599999999965, 20.32), (65.78599999999965, -12.258136289138479))
            Line((65.78599999999965, -12.258136289138479), (55.62599999999965, -12.258136289138479))
            ThreePointArc((55.62599999999965, -12.258136289138479), (52.32254219659335, -3.8667971326053205), (44.17543926155394, 0))
            Line((44.17543926155394, 0), (34.03599999999965, -1.21e-15))
            Line((34.03599999999965, -1.21e-15), (34.03599999999965, 20.32))
        make_face()
        with Locations((43.63599999999964, 10.741863710861484)):
            Circle(SKETCH81_R, mode=Mode.SUBTRACT)
        with Locations((60.30111511679786, 3.2102714393784137)):
            Circle(SKETCH81_R_2, mode=Mode.SUBTRACT)
        with Locations((60.30111511679786, -4.726544017655412)):
            Circle(SKETCH81_R_3, mode=Mode.SUBTRACT)
    extrude(amount=BOSS_EXTRUDE12_DEPTH)


solid = Compound([part.part, body_2.part, body_3.part])
